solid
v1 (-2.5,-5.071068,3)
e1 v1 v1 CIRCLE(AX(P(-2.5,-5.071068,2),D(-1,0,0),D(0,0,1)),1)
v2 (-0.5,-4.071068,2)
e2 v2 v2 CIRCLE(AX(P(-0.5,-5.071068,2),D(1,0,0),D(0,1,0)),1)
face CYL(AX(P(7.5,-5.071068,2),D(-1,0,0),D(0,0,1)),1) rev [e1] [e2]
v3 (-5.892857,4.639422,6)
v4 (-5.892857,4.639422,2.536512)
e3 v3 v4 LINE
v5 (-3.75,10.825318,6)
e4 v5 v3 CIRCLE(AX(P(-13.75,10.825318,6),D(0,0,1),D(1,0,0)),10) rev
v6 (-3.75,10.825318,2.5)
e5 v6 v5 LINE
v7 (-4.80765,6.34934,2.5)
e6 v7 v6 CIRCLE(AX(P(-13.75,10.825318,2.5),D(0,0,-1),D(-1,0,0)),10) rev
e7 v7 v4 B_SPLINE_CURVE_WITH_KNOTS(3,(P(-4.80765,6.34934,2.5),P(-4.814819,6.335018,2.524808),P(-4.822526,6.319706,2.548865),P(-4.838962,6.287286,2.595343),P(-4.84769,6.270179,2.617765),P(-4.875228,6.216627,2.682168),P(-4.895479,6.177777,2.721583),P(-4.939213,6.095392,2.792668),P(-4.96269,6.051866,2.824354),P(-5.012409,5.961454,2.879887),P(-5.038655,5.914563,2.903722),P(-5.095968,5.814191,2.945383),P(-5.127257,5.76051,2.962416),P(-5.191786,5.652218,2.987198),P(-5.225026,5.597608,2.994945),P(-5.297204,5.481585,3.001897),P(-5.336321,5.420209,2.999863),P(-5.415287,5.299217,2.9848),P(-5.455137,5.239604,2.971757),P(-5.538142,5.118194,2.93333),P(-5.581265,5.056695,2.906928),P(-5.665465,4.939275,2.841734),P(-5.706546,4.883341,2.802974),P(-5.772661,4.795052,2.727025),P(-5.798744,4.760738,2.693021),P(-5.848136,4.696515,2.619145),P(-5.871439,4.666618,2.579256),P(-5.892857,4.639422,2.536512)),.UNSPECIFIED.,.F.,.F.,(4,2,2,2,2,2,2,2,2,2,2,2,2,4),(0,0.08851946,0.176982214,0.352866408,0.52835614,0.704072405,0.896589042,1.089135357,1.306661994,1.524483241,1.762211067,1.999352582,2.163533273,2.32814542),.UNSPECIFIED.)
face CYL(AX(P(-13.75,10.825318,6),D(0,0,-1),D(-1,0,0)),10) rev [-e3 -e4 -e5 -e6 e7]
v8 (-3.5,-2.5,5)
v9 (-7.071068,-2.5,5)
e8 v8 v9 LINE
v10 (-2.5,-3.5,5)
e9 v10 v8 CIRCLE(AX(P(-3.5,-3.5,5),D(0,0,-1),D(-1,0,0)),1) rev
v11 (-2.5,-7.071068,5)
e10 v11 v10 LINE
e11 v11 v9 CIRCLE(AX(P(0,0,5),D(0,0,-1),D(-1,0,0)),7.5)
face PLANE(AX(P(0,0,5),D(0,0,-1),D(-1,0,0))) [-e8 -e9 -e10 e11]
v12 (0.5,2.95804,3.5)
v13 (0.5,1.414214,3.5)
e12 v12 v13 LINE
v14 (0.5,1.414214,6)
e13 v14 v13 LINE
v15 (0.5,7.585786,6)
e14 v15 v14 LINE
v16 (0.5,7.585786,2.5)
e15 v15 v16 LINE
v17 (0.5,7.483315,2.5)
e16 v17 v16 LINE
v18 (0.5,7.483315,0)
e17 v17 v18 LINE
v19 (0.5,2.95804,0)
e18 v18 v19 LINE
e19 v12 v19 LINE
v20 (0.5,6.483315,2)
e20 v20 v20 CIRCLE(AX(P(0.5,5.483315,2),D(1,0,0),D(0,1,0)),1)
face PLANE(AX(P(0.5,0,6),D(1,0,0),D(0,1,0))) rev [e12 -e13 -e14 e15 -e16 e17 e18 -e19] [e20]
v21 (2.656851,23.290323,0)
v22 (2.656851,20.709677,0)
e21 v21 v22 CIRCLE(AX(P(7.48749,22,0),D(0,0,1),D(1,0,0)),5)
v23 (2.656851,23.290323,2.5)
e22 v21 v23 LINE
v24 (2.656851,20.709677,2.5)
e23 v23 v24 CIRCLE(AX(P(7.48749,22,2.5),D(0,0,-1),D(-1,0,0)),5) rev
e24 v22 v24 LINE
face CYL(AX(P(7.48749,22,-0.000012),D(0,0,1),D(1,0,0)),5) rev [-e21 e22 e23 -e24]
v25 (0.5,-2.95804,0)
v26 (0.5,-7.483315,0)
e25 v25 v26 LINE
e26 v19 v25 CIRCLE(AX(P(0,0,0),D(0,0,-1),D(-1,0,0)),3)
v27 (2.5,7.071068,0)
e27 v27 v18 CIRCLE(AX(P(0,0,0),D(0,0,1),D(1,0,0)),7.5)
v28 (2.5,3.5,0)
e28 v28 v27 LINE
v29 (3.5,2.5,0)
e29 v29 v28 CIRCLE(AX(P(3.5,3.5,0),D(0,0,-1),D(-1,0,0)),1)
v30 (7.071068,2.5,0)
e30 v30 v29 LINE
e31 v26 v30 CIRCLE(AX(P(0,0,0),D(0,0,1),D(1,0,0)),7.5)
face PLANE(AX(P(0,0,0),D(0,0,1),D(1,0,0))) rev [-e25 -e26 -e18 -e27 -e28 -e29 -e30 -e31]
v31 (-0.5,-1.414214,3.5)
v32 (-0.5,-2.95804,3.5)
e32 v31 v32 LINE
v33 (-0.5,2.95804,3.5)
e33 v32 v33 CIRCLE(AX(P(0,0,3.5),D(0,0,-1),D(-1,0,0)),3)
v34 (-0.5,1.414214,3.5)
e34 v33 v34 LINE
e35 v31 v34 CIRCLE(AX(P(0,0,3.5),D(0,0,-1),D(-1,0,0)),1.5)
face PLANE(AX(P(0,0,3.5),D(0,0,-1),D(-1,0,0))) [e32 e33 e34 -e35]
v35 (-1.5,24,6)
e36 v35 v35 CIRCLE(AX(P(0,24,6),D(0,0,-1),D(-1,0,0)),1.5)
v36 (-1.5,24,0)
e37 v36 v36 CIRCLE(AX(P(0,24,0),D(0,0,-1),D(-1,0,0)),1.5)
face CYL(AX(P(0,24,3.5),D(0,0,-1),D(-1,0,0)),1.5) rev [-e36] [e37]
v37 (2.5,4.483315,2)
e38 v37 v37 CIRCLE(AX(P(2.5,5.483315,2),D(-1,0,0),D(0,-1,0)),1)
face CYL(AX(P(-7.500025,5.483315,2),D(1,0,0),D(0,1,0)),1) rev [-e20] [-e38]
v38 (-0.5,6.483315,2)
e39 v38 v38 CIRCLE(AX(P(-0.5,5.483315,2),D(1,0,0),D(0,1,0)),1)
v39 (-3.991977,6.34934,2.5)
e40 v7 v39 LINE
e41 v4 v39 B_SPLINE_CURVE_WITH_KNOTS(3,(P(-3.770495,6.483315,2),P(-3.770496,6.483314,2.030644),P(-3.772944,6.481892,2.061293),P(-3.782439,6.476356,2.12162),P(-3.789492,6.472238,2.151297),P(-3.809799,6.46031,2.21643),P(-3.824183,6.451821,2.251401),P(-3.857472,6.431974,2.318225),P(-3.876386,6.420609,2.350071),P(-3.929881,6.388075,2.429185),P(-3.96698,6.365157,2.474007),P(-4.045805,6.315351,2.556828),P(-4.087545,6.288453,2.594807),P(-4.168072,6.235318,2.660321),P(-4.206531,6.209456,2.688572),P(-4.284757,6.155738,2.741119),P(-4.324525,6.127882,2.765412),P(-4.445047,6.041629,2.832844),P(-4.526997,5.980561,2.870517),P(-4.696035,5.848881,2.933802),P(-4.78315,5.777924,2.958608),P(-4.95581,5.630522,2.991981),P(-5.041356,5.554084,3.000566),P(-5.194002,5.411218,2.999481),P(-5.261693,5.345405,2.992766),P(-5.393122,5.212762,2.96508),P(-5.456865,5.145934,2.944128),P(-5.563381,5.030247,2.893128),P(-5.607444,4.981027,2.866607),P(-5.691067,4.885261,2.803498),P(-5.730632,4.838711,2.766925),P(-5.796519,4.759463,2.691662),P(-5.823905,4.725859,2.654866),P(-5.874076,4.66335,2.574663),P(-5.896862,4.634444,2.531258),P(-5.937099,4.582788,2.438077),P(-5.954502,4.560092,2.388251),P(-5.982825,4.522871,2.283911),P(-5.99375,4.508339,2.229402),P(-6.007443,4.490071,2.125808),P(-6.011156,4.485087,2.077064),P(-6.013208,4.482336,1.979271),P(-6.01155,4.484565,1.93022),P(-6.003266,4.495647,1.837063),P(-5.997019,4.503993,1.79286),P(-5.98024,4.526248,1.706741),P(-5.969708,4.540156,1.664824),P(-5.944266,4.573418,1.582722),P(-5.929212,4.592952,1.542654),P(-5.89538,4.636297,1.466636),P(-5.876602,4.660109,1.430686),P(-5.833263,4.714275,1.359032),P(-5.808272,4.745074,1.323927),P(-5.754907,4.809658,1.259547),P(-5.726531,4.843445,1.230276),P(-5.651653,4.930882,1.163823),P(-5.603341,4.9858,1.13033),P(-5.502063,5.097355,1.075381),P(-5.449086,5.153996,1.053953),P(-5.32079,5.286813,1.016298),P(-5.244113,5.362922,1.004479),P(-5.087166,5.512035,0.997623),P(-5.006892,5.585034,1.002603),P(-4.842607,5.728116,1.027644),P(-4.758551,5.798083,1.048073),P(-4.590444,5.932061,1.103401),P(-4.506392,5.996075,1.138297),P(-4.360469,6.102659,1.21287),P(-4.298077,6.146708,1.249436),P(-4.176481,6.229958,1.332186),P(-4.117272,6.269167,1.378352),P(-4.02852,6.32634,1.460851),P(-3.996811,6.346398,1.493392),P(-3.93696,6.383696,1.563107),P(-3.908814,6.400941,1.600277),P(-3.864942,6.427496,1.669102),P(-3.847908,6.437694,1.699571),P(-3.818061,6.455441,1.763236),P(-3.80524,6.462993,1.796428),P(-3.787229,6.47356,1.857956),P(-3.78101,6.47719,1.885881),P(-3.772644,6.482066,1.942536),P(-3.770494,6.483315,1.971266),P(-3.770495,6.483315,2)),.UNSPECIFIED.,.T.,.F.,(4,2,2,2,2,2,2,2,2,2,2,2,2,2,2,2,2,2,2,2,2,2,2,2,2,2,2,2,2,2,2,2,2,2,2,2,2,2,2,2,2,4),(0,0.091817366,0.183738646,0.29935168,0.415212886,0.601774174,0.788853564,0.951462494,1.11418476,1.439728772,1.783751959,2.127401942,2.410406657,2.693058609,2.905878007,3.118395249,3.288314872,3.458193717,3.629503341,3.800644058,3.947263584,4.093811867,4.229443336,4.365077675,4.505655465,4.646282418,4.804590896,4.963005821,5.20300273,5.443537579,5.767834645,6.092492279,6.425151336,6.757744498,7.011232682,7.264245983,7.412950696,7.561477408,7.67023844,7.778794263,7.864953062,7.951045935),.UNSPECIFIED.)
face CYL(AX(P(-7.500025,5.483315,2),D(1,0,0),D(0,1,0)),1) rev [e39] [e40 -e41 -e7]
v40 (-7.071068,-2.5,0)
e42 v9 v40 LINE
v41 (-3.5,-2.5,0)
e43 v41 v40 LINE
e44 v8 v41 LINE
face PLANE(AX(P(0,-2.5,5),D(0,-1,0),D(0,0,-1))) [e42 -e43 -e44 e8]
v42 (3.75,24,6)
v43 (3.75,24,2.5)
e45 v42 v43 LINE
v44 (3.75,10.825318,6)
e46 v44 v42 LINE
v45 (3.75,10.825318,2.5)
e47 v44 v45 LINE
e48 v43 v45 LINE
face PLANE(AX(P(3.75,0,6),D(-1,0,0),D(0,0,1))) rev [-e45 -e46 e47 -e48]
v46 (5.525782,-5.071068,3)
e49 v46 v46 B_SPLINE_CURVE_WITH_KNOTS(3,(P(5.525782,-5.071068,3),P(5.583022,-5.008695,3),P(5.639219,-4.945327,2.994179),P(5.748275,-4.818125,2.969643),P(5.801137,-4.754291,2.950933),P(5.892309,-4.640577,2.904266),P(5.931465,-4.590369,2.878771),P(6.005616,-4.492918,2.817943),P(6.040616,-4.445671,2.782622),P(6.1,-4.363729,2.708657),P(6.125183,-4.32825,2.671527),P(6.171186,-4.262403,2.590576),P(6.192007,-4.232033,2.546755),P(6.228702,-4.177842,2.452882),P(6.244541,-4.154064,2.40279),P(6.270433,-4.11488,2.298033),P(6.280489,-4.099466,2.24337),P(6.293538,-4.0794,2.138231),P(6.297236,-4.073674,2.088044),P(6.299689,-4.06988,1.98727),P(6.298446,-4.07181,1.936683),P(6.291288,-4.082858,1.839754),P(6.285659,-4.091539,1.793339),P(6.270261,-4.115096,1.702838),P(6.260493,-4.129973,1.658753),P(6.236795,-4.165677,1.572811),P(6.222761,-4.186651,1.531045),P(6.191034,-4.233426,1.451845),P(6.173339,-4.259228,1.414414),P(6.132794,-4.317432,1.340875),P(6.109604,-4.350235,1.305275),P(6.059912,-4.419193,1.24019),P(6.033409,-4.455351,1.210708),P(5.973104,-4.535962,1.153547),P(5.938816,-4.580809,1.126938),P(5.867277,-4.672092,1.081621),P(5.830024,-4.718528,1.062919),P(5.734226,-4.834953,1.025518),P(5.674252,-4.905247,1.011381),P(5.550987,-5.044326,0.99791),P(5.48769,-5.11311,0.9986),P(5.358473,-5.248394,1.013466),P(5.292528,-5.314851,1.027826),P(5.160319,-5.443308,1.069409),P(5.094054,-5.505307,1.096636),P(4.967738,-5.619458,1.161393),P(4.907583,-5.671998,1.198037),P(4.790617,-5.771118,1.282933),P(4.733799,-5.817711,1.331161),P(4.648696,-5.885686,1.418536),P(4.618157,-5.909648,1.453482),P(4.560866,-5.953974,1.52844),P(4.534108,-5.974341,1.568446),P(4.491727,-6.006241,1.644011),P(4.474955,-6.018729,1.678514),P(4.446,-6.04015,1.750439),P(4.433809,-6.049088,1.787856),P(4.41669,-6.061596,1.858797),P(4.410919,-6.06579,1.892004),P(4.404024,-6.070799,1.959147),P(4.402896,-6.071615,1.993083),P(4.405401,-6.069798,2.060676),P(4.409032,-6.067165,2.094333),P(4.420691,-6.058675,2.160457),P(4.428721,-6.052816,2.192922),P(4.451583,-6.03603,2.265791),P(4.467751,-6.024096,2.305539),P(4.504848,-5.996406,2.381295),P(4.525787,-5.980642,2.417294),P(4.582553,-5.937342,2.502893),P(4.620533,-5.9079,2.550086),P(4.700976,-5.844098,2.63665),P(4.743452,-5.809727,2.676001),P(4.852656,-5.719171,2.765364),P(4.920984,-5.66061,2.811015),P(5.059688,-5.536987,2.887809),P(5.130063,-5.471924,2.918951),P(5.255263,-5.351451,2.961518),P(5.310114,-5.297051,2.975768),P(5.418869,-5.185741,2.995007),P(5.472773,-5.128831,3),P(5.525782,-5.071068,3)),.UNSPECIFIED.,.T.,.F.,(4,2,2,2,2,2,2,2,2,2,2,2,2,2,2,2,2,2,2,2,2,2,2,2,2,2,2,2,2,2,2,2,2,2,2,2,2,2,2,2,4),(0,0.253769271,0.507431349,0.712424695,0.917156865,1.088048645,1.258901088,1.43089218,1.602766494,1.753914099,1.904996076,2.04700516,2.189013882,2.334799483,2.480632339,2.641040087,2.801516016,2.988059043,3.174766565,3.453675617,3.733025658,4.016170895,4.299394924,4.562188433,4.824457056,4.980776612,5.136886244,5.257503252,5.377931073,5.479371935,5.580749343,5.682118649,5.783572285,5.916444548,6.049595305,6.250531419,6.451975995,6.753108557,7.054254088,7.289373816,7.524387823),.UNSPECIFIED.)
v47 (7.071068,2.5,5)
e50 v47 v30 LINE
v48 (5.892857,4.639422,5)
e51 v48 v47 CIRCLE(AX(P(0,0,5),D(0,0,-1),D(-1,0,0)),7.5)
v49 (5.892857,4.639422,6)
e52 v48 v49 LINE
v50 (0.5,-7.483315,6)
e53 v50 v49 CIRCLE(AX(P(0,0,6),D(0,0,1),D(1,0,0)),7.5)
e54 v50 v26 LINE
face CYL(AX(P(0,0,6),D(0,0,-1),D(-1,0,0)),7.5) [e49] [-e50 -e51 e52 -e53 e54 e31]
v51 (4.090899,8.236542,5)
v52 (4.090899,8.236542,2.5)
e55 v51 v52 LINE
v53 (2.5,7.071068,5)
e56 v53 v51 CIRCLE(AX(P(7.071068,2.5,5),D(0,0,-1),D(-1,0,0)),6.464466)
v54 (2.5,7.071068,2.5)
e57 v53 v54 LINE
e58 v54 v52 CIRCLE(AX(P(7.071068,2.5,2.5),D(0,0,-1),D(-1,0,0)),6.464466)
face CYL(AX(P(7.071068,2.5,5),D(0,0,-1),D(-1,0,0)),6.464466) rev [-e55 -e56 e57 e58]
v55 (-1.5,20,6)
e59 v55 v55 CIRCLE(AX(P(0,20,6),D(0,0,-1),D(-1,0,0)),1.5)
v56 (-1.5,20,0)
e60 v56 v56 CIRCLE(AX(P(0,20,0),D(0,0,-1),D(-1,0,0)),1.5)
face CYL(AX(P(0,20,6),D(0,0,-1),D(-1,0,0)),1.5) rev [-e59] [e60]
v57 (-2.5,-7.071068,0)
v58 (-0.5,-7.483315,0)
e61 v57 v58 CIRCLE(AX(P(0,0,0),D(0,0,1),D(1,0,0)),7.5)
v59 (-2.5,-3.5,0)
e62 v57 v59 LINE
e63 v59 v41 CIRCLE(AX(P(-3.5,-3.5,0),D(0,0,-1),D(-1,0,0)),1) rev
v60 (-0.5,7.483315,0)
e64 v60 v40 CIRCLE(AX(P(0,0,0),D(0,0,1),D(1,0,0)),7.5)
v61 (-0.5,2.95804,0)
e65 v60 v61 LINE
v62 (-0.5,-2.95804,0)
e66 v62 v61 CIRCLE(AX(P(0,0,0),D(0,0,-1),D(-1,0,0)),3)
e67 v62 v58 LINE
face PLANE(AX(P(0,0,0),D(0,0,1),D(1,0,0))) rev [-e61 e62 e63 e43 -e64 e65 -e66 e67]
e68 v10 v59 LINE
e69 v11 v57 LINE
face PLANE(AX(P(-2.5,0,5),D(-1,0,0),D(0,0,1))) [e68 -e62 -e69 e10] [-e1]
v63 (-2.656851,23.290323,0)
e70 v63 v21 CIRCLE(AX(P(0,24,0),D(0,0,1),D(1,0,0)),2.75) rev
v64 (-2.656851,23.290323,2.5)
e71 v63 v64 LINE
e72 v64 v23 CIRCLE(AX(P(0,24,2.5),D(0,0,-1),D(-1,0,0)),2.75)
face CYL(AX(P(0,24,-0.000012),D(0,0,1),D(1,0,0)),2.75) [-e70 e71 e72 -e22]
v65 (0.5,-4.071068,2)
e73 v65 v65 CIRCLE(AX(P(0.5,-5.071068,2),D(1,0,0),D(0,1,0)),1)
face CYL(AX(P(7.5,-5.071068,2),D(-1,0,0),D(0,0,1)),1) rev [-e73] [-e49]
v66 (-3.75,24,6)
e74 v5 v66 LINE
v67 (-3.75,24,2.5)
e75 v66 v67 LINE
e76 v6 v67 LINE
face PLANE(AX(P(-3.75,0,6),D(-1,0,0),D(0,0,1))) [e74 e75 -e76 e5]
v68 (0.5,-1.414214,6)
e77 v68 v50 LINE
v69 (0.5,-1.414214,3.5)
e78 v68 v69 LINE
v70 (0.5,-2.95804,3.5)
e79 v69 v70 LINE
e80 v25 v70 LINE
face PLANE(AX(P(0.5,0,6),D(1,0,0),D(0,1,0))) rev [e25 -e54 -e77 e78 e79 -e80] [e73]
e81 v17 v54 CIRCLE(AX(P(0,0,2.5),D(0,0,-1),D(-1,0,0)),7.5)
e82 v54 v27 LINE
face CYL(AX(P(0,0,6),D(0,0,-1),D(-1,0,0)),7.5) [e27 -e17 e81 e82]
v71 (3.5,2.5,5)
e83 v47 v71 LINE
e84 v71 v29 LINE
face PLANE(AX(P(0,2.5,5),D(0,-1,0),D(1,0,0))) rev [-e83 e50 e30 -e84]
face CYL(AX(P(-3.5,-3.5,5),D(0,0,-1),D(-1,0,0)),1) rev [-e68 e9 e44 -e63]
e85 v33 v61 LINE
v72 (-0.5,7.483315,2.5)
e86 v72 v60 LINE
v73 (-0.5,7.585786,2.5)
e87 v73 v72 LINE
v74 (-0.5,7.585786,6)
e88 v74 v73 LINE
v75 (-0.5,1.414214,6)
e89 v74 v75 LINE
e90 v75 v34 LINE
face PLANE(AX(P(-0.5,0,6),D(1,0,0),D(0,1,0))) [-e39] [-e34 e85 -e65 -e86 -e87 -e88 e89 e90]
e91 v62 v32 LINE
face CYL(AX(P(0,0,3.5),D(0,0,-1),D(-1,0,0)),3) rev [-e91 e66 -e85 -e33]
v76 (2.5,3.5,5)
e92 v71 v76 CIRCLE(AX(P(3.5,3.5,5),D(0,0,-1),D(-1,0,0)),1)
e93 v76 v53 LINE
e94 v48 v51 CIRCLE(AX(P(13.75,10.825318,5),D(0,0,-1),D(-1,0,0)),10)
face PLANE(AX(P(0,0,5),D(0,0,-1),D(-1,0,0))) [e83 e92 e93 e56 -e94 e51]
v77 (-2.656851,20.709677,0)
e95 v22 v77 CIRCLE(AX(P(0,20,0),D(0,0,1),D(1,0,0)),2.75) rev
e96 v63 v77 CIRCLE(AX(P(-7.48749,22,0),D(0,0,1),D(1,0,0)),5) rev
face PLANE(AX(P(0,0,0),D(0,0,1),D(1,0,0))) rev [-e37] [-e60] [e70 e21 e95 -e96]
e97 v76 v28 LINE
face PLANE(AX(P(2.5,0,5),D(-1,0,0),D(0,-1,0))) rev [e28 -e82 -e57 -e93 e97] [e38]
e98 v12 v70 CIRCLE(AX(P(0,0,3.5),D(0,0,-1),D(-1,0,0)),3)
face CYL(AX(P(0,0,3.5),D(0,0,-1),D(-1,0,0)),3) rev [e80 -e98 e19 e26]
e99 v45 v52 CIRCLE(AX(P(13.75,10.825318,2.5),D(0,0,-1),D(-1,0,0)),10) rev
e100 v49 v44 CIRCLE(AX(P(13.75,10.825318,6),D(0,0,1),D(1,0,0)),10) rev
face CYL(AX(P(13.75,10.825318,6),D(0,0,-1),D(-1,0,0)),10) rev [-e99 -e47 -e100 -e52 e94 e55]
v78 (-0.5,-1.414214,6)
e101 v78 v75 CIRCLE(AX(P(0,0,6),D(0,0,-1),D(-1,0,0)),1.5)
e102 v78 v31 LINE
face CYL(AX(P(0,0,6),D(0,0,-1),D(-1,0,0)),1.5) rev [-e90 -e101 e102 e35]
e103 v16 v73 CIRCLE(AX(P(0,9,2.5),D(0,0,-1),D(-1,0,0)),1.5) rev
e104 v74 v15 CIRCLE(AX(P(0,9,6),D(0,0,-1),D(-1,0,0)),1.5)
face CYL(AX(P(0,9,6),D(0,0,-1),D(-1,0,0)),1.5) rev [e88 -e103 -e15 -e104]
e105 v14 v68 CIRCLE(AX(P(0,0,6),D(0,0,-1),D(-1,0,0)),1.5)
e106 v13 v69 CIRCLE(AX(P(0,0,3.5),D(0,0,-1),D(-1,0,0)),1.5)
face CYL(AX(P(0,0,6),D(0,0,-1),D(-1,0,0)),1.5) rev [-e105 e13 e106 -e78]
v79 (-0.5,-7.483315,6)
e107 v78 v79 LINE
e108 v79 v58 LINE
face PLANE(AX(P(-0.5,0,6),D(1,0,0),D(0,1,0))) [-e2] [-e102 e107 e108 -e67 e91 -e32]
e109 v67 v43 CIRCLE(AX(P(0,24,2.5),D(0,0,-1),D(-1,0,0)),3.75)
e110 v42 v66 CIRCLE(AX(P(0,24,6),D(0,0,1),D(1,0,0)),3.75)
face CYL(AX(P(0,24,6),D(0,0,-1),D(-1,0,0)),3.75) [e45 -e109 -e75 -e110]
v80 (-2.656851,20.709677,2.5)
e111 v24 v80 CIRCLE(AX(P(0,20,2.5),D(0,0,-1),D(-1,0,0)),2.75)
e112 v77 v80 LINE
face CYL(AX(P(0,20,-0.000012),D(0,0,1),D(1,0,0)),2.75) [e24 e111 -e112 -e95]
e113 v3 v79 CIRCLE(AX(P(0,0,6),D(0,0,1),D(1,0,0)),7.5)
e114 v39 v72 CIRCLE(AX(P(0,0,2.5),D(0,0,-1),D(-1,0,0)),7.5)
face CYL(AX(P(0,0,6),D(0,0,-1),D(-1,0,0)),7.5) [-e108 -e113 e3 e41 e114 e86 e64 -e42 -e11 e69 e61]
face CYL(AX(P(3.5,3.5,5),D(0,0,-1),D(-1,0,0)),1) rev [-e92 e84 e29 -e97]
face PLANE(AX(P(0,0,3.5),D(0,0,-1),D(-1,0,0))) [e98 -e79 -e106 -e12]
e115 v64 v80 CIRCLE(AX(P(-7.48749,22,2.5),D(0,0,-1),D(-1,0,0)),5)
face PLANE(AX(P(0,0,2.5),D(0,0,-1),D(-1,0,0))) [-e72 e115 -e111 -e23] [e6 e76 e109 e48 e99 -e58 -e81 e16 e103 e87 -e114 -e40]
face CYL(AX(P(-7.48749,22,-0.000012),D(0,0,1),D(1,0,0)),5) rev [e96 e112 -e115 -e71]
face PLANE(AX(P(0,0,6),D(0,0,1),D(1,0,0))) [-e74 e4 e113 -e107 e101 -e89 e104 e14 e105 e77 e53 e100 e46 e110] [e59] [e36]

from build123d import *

# Parameters (mm, degrees)
SKETCH_1_R               = 7.5
EXTRUDE_1_DEPTH          = 6
FILLET_1_R               = 10
SKETCH_2_R               = 1.5
SKETCH_2_R_2             = 3
CUT_EXTRUDE_1_DEPTH      = 3.5
CUT_EXTRUDE_2_DEPTH      = 29.957943642
CUT_EXTRUDE_2_DEPTH_BACK = 29.957943642
SKETCH_3_R               = 1.5
CUT_EXTRUDE_3_DEPTH      = 30.365157926
CUT_EXTRUDE_3_DEPTH_BACK = 2.5
CUT_EXTRUDE_START        = -5
CUT_EXTRUDE_4_DEPTH      = 5
CUT_EXTRUDE_5_DEPTH      = 31.10087208
CUT_EXTRUDE_5_DEPTH_BACK = 31.10087208
SKETCH_6_R               = 1
CUT_EXTRUDE_6_DEPTH      = 31.1008721
CUT_EXTRUDE_6_DEPTH_BACK = 31.1008721
SKETCH_7_R               = 1


# Read off the part's stored shape, not the designer's step: 除料-伸長4
with BuildPart() as part:
    # 草圖1 → 填料-伸長1 (new body)
    with BuildSketch(Plane.XY):
        Circle(SKETCH_1_R)
        with BuildLine():
            Line((-3.75, 0), (-3.75, 24))
            ThreePointArc((-3.75, 24), (0, 27.75), (3.75, 24))
            Line((3.75, 24), (3.75, 0))
            ThreePointArc((3.75, 0), (0, -3.75), (-3.75, 0))
        make_face()
    extrude(amount=EXTRUDE_1_DEPTH)

    # 圓角1
    fillet_1_edges = [part.edges().sort_by_distance(p)[0] for p in [
        (-3.75, 6.495190528, 3),
        (3.75, 6.495190528, 3),
    ]]
    fillet(fillet_1_edges, radius=FILLET_1_R)

    # 草圖2 → 除料-伸長1 (cut)
    with BuildSketch(Plane(origin=(0, 0, 0), x_dir=(-1, 0, 0), z_dir=(0, 0, -1))):
        with Locations((0, 24)):
            Circle(SKETCH_2_R)
        Circle(SKETCH_2_R_2)
    extrude(amount=-CUT_EXTRUDE_1_DEPTH, mode=Mode.SUBTRACT)

    # 草圖3 → 除料-伸長2 (cut, two sides: drawn at the far end of the back side and taken through both)
    with BuildSketch(Plane(origin=(0, 0, 3.5), x_dir=(-1, 0, 0), z_dir=(0, 0, -1)).offset(-CUT_EXTRUDE_2_DEPTH_BACK)):
        with BuildLine():
            Line((-0.5, 7.585786438), (-0.5, 1.414213562))
            ThreePointArc((-0.5, 1.414213562), (-1.5, 0), (-0.5, -1.414213562))
            Line((-0.5, -1.414213562), (-0.5, -8))
            ThreePointArc((-0.5, -8), (0, -8.5), (0.5, -8))
            Line((0.5, -8), (0.5, -1.414213562))
            ThreePointArc((0.5, -1.414213562), (1.5, 0), (0.5, 1.414213562))
            Line((0.5, 1.414213562), (0.5, 7.585786438))
            ThreePointArc((0.5, 7.585786438), (0, 10.5), (-0.5, 7.585786438))
        make_face()
        with Locations((0, 24)):
            Circle(SKETCH_3_R)
        with Locations((0, 20)):
            Circle(SKETCH_3_R)
    extrude(amount=CUT_EXTRUDE_2_DEPTH + CUT_EXTRUDE_2_DEPTH_BACK, mode=Mode.SUBTRACT)

    # 草圖4 → 除料-伸長3 (cut, two sides: drawn at the far end of the back side and taken through both)
    with BuildSketch(Plane(origin=(0, 0, 0), x_dir=(-1, 0, 0), z_dir=(0, 0, -1)).offset(-CUT_EXTRUDE_3_DEPTH_BACK)):
        with BuildLine():
            Line((0.5, 7.585786438), (0.5, 7.483314774))
            ThreePointArc((0.5, 7.483314774), (3.498440712, 6.634072097), (5.892857143, 4.639421806))
            ThreePointArc((5.892857143, 4.639421806), (4.300888175, 7.552049194), (3.75, 10.825317547))
            Line((3.75, 10.825317547), (3.75, 24))
            ThreePointArc((3.75, 24), (0, 27.75), (-3.75, 24))
            Line((-3.75, 24), (-3.75, 10.825317547))
            ThreePointArc((-3.75, 10.825317547), (-4.300888175, 7.552049194), (-5.892857143, 4.639421806))
            ThreePointArc((-5.892857143, 4.639421806), (-3.498440712, 6.634072097), (-0.5, 7.483314774))
            Line((-0.5, 7.483314774), (-0.5, 7.585786438))
            ThreePointArc((-0.5, 7.585786438), (0, 10.5), (0.5, 7.585786438))
        make_face()
        with BuildLine():
            ThreePointArc((-2.656851136, 23.290322581), (0, 26.75), (2.656851136, 23.290322581))
            ThreePointArc((2.656851136, 23.290322581), (2.487489566, 22), (2.656851136, 20.709677419))
            ThreePointArc((2.656851136, 20.709677419), (0, 17.25), (-2.656851136, 20.709677419))
            ThreePointArc((-2.656851136, 20.709677419), (-2.487489566, 22), (-2.656851136, 23.290322581))
        make_face(mode=Mode.SUBTRACT)
    extrude(amount=CUT_EXTRUDE_3_DEPTH + CUT_EXTRUDE_3_DEPTH_BACK, mode=Mode.SUBTRACT)

    # 除料-伸長4 outline → 除料-伸長4 (cut)
    with BuildSketch(Plane(origin=(0, 0, 0), x_dir=(-1, 0, 0), z_dir=(0, 0, -1)).offset(CUT_EXTRUDE_START)):
        with BuildLine():
            ThreePointArc((-4.090898557, 8.23654191), (-4.80910956, 6.346425035), (-5.892857143, 4.639421806))
            ThreePointArc((-5.892857143, 4.639421806), (-6.569636137, 3.617994061), (-7.071067812, 2.5))
            Line((-7.071067812, 2.5), (-3.5, 2.5))
            ThreePointArc((-3.5, 2.5), (-2.792893219, 2.792893219), (-2.5, 3.5))
            Line((-2.5, 3.5), (-2.5, 7.071067812))
            ThreePointArc((-2.5, 7.071067812), (-3.250743509, 7.714829249), (-4.090898557, 8.23654191))
        make_face()
        with BuildLine():
            Line((7.071067812, -2.5), (3.5, -2.5))
            ThreePointArc((3.5, -2.5), (2.792893219, -2.792893219), (2.5, -3.5))
            Line((2.5, -3.5), (2.5, -7.071067812))
            ThreePointArc((2.5, -7.071067812), (5.303300859, -5.303300859), (7.071067812, -2.5))
        make_face()
    extrude(amount=CUT_EXTRUDE_4_DEPTH, mode=Mode.SUBTRACT)

    # 草圖6 → 除料-伸長5 (cut, two sides: drawn at the far end of the back side and taken through both)
    with BuildSketch(Plane.ZY.offset(2.5).offset(-CUT_EXTRUDE_5_DEPTH_BACK)):
        with Locations((2, -5.071067812)):
            Circle(SKETCH_6_R)
    extrude(amount=CUT_EXTRUDE_5_DEPTH + CUT_EXTRUDE_5_DEPTH_BACK, mode=Mode.SUBTRACT)

    # 草圖7 → 除料-伸長6 (cut, two sides: drawn at the far end of the back side and taken through both)
    with BuildSketch(Plane(origin=(2.5, 0, 0), x_dir=(0, 0, -1), z_dir=(1, 0, 0)).offset(-CUT_EXTRUDE_6_DEPTH_BACK)):
        with Locations(Location((-2, 5.483314774, 0), (0, 0, 90))):
            Circle(SKETCH_7_R)
    extrude(amount=CUT_EXTRUDE_6_DEPTH + CUT_EXTRUDE_6_DEPTH_BACK, mode=Mode.SUBTRACT)


solid = part.part
